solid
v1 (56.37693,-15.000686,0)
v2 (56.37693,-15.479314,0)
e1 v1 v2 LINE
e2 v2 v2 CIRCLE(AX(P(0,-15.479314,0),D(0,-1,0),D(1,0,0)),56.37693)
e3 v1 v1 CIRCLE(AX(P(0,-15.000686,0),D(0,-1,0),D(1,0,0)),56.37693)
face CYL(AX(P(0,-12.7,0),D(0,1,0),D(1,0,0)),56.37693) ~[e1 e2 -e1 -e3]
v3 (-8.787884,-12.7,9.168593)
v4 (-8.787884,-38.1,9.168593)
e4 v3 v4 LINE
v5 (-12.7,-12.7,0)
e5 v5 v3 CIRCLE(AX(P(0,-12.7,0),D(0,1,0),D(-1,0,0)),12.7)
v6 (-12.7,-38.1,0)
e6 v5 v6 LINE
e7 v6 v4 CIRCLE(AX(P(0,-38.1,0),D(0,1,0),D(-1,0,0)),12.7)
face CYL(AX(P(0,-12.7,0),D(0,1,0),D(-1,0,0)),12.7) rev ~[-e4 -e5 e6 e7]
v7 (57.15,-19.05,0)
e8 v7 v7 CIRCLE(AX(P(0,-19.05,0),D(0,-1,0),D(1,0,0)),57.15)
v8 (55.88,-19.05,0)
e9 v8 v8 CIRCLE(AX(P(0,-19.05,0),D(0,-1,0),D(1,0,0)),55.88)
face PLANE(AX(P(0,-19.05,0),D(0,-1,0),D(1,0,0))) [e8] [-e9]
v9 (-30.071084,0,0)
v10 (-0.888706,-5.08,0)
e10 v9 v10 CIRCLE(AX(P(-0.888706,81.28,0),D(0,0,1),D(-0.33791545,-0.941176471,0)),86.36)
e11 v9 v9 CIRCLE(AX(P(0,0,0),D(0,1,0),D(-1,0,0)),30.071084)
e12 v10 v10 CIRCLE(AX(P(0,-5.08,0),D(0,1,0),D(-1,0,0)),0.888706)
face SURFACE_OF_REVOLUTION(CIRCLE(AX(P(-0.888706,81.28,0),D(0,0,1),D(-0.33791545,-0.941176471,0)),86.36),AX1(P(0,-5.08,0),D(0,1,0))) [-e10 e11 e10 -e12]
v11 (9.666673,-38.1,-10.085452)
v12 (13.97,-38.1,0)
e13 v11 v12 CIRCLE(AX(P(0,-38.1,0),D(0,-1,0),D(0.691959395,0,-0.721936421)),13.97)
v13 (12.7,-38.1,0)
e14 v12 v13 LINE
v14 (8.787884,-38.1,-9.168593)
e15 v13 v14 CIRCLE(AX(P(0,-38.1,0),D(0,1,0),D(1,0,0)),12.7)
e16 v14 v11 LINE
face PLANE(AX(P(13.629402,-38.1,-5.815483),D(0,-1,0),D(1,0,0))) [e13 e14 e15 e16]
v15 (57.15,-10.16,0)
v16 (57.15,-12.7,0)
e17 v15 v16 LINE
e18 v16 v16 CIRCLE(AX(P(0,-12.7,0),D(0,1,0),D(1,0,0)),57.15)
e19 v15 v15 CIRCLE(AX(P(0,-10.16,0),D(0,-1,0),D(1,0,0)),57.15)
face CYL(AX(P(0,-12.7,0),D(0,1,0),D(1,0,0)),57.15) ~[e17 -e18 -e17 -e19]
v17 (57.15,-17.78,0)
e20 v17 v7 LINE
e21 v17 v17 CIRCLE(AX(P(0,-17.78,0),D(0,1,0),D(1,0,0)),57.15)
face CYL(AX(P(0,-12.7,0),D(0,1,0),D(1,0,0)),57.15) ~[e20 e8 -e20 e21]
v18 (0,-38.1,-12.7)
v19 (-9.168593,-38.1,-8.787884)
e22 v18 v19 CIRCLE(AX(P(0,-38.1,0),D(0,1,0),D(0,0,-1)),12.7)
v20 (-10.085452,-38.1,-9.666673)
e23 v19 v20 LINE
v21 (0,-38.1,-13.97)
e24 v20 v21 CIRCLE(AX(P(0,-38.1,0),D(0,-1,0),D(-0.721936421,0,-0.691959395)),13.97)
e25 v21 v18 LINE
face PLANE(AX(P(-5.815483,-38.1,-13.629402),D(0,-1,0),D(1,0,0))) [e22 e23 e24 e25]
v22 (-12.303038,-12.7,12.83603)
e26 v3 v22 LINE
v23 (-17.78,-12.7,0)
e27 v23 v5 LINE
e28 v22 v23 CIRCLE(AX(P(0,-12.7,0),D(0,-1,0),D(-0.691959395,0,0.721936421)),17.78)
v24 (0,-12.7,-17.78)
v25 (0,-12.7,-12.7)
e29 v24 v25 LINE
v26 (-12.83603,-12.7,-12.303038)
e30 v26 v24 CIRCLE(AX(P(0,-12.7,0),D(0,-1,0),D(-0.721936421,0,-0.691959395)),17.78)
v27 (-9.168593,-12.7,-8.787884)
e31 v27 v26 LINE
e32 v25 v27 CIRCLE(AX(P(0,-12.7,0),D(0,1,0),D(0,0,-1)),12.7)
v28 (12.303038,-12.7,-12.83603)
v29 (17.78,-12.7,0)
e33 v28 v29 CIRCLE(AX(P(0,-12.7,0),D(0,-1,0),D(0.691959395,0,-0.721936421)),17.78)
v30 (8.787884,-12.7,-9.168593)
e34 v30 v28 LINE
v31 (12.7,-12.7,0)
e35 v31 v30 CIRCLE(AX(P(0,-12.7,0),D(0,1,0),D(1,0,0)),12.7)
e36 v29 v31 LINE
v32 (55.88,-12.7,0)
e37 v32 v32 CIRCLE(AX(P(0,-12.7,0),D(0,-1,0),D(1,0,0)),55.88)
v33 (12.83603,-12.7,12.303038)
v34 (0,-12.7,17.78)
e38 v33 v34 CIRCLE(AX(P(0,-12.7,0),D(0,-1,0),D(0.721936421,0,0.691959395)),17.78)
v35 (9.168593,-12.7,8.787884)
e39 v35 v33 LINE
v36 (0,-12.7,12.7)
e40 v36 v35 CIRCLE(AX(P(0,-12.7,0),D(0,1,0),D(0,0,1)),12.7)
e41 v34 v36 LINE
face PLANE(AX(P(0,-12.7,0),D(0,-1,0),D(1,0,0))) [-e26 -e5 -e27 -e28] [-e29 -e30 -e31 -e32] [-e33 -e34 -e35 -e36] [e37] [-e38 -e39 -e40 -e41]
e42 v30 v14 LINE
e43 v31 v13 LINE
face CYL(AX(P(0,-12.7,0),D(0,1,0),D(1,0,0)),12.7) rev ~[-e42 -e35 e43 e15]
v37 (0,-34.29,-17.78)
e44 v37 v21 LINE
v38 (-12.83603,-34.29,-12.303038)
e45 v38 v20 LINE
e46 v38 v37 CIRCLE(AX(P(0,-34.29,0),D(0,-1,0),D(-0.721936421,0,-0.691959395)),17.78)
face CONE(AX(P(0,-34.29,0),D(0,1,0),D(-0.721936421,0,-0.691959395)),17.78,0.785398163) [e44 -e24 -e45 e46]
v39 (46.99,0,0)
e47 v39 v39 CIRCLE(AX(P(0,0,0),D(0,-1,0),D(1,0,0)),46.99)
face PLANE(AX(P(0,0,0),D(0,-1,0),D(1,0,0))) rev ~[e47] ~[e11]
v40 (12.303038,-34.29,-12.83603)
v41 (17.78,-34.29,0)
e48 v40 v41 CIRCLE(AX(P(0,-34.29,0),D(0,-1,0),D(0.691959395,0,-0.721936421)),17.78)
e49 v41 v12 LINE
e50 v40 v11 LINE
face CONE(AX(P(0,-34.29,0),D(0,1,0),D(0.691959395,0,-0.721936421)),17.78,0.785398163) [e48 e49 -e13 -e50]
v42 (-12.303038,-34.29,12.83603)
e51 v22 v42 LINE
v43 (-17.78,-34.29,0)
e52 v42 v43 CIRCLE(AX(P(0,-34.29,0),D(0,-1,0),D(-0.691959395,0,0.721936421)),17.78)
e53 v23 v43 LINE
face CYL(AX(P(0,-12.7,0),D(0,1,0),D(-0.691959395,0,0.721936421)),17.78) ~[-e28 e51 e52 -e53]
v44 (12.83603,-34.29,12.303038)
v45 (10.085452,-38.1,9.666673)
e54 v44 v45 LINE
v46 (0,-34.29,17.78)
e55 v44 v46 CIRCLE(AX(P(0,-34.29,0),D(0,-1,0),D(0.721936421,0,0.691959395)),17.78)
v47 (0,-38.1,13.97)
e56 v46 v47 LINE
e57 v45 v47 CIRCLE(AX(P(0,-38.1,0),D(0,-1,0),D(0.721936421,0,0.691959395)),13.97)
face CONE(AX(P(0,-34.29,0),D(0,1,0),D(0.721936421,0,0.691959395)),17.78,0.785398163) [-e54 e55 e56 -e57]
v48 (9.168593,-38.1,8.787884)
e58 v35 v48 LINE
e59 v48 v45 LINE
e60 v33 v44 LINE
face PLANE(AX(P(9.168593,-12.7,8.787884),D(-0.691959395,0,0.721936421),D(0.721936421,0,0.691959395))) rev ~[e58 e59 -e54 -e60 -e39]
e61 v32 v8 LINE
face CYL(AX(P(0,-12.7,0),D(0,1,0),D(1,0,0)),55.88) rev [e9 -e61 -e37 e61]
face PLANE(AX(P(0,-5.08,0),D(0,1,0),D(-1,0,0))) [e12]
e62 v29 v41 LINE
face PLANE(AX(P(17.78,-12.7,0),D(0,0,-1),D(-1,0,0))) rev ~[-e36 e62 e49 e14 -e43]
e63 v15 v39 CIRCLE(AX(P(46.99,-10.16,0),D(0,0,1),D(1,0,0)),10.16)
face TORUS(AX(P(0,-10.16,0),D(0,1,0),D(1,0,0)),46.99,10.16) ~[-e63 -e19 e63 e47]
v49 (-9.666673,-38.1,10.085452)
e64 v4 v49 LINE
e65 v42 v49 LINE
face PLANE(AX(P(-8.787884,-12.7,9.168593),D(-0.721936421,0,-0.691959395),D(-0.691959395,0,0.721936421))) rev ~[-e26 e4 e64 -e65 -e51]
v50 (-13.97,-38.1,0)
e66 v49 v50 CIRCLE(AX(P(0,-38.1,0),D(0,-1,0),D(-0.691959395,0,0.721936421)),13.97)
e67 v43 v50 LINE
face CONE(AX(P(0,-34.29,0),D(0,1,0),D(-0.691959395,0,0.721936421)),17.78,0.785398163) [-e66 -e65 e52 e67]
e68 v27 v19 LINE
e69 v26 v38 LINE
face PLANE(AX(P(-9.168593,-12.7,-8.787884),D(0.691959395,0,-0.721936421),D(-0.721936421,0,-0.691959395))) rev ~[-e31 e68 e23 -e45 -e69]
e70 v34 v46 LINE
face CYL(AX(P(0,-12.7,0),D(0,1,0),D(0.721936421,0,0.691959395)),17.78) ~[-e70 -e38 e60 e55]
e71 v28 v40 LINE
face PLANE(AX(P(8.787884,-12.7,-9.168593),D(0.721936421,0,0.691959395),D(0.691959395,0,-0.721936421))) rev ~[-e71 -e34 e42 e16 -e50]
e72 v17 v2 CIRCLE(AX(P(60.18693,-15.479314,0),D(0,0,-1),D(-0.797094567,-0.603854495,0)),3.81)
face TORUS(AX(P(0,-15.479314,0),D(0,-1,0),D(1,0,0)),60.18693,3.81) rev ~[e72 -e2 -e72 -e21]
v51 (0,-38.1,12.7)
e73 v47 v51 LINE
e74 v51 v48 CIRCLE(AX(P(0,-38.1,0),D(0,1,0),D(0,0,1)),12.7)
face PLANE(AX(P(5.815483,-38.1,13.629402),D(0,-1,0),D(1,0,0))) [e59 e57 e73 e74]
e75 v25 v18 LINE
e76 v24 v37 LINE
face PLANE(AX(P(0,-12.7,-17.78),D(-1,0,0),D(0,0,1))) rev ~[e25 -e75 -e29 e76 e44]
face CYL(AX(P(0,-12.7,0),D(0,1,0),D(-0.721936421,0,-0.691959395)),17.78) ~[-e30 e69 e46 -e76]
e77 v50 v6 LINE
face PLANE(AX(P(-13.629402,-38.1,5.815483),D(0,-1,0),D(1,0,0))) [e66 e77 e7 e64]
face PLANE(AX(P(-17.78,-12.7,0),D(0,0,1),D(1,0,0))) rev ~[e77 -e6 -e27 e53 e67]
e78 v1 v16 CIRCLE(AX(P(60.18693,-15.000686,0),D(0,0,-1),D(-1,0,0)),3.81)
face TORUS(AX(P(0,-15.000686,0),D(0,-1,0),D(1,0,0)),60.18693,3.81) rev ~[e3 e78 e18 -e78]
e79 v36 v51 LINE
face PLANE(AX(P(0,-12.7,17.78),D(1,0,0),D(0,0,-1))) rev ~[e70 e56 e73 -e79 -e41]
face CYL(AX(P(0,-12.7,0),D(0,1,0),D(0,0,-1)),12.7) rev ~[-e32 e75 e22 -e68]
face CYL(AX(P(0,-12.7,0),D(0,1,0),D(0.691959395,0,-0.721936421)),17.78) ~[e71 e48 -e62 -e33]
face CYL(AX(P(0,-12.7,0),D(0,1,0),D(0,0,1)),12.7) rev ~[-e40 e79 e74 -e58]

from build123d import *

# Parameters (mm, degrees)
F0_R      = 57.15
F0_R_2    = 54.61
F1_DEPTH  = 12.7
F2_R      = 57.15
F2_R_2    = 55.88
F3_DEPTH  = 6.35
F5_DEPTH  = 25.4
F6_R      = 10.16
F8_R      = 57.3643246116
F8_R_2    = 56.3769302999
F9_DEPTH  = 5.08
F11_SIZE  = 3.81
F12_R     = 30.0710840357
F13_DEPTH = 5.08


# Not quite as in the source:
# - a fillet or chamfer that OpenCascade refuses, or shapes differently, is made with other operations: its cross-section is extruded or revolved along the edge and cut away or added
# - a feature names something its author has since deleted; it is built from what else it names


with BuildPart() as f1:
    # F0 (on Front) → F1 (new body)
    with BuildSketch(Plane.XZ):
        Circle(F0_R)
        Circle(F0_R_2, mode=Mode.SUBTRACT)
        Circle(F0_R_2)
    extrude(amount=F1_DEPTH)

    # F2 (on face) → F3 (join)
    with BuildSketch(Plane.XZ.offset(12.7)):
        Circle(F2_R)
        Circle(F2_R_2, mode=Mode.SUBTRACT)
    extrude(amount=F3_DEPTH)

    # F4 (on face) → F5 (join)
    with BuildSketch(Plane.XZ.offset(12.7)):
        with BuildLine():
            Line((9.1685925479, 8.7878843126), (12.836029567, 12.3030380376))
            ThreePointArc((12.836029567, 12.3030380376), (6.9778357566, 16.3535380928), (0, 17.78))
            Line((0, 17.78), (0, 12.7))
            ThreePointArc((0, 12.7), (4.9841683976, 11.6810986377), (9.1685925479, 8.7878843126))
        make_face()
        with BuildLine():
            ThreePointArc((12.3030380376, -12.836029567), (16.3535380928, -6.9778357566), (17.78, 0))
            Line((17.78, 0), (12.7, 0))
            ThreePointArc((12.7, 0), (11.6810986377, -4.9841683976), (8.7878843126, -9.1685925479))
            Line((8.7878843126, -9.1685925479), (12.3030380376, -12.836029567))
        make_face()
        with BuildLine():
            ThreePointArc((-12.836029567, -12.3030380376), (-6.9778357566, -16.3535380928), (0, -17.78))
            Line((0, -17.78), (0, -12.7))
            ThreePointArc((0, -12.7), (-4.9841683976, -11.6810986377), (-9.1685925479, -8.7878843126))
            Line((-9.1685925479, -8.7878843126), (-12.836029567, -12.3030380376))
        make_face()
        with BuildLine():
            Line((-8.7878843126, 9.1685925479), (-12.3030380376, 12.836029567))
            ThreePointArc((-12.3030380376, 12.836029567), (-16.3535380928, 6.9778357566), (-17.78, 0))
            Line((-17.78, 0), (-12.7, 0))
            ThreePointArc((-12.7, 0), (-11.6810986377, 4.9841683976), (-8.7878843126, 9.1685925479))
        make_face()
    extrude(amount=F5_DEPTH)

    # F6
    f6_edges = [f1.edges().sort_by_distance(p)[0] for p in [
        (-57.15, 0, 0),
    ]]
    fillet(f6_edges, radius=F6_R)

    # F8 (on offset) → F9 (cut)
    with BuildSketch(Plane.XZ.offset(12.7)):
        Circle(F8_R)
        Circle(F8_R_2, mode=Mode.SUBTRACT)
    extrude(amount=F9_DEPTH, mode=Mode.SUBTRACT)

    # F10: fillet of radius 3.81 on 3 edges, made by hand

    # F10_s1 → F10_t2 (revolve)
    with BuildSketch(Plane.XY):
        with BuildLine():
            ThreePointArc((56.3769302999, -15.0006856268), (56.5753652345, -13.7871380263), (57.15, -12.7))
            Line((57.15, -12.7), (57.089261394, -12.6539862875))
            ThreePointArc((57.089261394, -12.6539862875), (56.7634651499, -12.6238), (56.3769302999, -12.6238))
            Line((56.3769302999, -12.6238), (56.3007302999, -12.7))
            Line((56.3007302999, -12.7), (56.3007302999, -15.0006856268))
            Line((56.3007302999, -15.0006856268), (56.3769302999, -15.0006856268))
        make_face()
    revolve(axis=Axis((0, -12.7, 0), (0, -1, 0)))

    # F10_s3 → F10_t4 (revolve)
    with BuildSketch(Plane.XY):
        with BuildLine():
            ThreePointArc((57.15, -17.78), (56.5753652345, -16.6928619737), (56.3769302999, -15.4793143732))
            Line((56.3769302999, -15.4793143732), (56.3007302999, -15.4793143732))
            Line((56.3007302999, -15.4793143732), (56.3007302999, -17.78))
            Line((56.3007302999, -17.78), (56.3769302999, -17.8562))
            ThreePointArc((56.3769302999, -17.8562), (56.7634651499, -17.8562), (57.089261394, -17.8260137125))
            Line((57.089261394, -17.8260137125), (57.15, -17.78))
        make_face()
    revolve(axis=Axis((0, -17.78, 0), (0, -1, 0)))

    # F11
    f11_edges = [f1.edges().sort_by_distance(p)[0] for p in [
        (-16.353538, -38.1, 6.977836),
        (-6.977836, -38.1, -16.353538),
        (16.353538, -38.1, -6.977836),
        (6.977836, -38.1, 16.353538),
    ]]
    chamfer(f11_edges, length=F11_SIZE)

    # F12 (on face) → F13 (cut)
    with BuildSketch(Plane(origin=(0, 0, 0), x_dir=(-1, 0, 0), z_dir=(0, 1, 0))):
        Circle(F12_R)
    extrude(amount=-F13_DEPTH, mode=Mode.SUBTRACT)

    # F14: fillet of radius 86.36 on 1 edges, made by hand

    # F14_s1 → F14_t2 (revolve)
    with BuildSketch(Plane.XY):
        with BuildLine():
            ThreePointArc((-30.0710840357, 0), (-15.6993236042, -3.8005218602), (-0.8887057913, -5.08))
            Line((-0.8887057913, -5.08), (-30.0710840357, -5.08))
            Line((-30.0710840357, -5.08), (-30.0710840357, 0))
        make_face()
    revolve(axis=Axis((0, -5.08, 0), (0, 1, 0)))


solid = f1.part
